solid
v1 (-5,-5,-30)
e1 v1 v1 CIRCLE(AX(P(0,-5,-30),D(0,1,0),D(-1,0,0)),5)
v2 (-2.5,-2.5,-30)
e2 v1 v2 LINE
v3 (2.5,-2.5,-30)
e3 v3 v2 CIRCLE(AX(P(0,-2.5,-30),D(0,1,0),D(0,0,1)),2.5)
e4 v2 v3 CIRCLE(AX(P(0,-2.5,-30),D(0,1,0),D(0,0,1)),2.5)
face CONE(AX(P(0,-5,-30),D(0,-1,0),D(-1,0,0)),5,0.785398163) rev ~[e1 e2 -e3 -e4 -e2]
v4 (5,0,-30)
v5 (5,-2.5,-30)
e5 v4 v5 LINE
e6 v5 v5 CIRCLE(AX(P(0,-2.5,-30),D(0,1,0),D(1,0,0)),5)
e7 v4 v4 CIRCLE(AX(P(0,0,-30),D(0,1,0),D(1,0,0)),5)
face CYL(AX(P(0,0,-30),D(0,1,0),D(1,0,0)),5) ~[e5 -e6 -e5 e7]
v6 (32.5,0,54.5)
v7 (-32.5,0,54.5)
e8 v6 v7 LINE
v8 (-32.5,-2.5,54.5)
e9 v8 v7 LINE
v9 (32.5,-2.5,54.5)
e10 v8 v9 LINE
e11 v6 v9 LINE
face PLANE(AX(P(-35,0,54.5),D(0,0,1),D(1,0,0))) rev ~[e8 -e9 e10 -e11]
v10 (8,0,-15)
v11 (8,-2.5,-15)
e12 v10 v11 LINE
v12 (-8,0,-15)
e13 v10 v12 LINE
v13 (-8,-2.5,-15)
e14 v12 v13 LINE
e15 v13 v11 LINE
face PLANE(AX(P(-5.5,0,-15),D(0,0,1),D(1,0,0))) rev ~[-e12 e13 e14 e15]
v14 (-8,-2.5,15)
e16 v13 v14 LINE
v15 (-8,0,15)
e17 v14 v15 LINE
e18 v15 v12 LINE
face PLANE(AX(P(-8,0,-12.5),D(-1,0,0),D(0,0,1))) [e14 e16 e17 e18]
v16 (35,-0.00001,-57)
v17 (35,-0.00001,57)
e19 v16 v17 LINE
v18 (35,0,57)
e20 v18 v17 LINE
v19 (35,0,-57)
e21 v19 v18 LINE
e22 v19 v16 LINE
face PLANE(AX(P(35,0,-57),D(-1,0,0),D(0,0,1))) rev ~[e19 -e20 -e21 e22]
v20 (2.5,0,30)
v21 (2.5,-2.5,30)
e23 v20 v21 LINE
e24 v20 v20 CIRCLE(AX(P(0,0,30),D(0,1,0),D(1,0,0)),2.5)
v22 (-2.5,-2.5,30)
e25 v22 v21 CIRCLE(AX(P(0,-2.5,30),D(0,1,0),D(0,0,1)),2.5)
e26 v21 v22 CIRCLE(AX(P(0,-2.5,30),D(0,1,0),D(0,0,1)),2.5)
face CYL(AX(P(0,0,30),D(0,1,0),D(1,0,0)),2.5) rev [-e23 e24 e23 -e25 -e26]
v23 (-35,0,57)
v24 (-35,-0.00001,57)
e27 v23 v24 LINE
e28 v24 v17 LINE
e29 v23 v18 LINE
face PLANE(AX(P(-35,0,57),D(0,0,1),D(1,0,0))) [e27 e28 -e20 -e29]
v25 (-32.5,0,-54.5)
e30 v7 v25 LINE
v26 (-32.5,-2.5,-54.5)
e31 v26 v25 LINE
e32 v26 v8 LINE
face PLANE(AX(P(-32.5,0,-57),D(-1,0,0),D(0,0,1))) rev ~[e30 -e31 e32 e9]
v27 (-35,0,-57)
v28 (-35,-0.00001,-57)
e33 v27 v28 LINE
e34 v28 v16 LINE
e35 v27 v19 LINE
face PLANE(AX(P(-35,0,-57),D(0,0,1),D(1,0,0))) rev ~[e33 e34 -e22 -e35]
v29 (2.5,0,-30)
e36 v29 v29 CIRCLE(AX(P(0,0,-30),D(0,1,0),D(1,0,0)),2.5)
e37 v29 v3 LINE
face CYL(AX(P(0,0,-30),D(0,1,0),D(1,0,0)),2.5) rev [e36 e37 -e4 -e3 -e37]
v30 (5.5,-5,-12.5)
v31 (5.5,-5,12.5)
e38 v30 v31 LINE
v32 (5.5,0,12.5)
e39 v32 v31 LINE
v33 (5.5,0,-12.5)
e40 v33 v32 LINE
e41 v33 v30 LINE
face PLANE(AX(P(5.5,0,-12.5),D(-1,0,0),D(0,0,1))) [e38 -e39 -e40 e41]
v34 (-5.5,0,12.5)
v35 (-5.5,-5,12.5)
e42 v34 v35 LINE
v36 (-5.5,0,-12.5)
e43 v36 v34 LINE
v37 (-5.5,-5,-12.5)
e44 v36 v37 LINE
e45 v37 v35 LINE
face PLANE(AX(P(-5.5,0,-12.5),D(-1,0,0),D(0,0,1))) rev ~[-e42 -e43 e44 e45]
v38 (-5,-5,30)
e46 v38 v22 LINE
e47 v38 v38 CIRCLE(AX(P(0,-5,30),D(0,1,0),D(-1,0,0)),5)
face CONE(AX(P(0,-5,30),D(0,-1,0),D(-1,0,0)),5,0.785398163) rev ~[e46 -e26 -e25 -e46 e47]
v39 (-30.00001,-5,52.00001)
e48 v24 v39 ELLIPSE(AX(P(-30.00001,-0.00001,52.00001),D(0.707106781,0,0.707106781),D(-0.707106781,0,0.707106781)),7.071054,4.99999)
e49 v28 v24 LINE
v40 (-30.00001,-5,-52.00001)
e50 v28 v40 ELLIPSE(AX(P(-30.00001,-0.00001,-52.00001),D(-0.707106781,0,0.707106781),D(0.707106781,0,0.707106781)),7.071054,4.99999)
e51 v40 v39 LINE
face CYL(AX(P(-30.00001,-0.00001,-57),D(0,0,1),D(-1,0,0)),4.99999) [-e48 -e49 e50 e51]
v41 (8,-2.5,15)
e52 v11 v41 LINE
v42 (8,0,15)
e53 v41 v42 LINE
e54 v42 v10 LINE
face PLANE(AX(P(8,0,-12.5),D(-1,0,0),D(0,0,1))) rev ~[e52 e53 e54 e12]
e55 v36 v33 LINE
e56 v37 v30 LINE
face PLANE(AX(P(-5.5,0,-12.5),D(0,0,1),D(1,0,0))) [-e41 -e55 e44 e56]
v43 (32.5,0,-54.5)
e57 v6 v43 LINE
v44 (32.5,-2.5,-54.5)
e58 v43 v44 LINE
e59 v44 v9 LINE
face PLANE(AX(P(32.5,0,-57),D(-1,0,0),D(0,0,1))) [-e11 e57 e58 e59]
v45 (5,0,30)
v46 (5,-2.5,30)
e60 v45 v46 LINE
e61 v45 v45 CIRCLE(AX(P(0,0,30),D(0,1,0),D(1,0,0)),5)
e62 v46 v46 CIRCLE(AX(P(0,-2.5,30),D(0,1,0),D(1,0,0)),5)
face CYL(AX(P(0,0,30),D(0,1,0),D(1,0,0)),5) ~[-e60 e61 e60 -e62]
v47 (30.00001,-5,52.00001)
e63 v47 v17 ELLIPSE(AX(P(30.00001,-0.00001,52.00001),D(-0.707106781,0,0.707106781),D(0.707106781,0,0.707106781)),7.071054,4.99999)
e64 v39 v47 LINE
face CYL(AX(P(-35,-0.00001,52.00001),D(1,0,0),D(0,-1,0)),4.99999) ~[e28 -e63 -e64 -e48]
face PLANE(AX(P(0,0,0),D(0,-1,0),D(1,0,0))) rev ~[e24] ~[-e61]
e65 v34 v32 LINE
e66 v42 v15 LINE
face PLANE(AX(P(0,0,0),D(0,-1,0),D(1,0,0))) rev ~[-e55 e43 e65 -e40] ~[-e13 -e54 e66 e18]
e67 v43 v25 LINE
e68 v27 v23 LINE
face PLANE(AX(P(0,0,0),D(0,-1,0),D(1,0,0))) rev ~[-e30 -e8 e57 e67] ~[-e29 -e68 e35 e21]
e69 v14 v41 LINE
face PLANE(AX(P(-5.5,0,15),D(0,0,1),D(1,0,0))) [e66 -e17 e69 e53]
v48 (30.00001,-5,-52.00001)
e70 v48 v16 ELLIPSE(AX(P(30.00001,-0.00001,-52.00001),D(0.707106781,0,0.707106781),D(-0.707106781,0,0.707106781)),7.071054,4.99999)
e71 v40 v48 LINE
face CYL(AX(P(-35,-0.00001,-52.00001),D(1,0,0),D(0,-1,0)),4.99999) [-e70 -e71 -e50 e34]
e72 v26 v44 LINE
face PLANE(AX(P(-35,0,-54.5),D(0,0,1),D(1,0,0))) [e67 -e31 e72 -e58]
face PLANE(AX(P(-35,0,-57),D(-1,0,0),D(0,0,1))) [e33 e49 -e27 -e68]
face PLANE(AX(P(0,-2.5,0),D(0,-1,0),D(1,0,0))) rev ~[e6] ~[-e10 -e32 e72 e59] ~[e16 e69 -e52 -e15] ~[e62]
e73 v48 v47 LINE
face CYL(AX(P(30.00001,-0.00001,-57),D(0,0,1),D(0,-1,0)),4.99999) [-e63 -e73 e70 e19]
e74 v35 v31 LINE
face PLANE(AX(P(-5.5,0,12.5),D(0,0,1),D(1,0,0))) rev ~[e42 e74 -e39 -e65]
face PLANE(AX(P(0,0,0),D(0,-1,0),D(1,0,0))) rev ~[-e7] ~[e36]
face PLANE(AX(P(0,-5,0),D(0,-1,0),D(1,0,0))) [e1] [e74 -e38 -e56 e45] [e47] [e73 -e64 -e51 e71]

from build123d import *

# Parameters (mm, degrees)
F0_W           = 70
F0_H           = 114
F0_R           = 2.5
F0_W_2         = 11
F0_H_2         = 25
F1_DEPTH       = 5
F2_T           = -2.5
F4_D           = 5
F4_CSINK_D     = 10
F4_CSINK_ANGLE = 90
F5_R           = 4.99999


# Not quite as in the source:
# - a fillet or chamfer is up to 0.001 mm smaller than in the source, because OpenCascade refuses the exact size


with BuildPart() as f1:
    # F0 (on Front) → F1 (new body)
    with BuildSketch(Plane.XZ):
        Rectangle(F0_W, F0_H)
        with Locations((0, -30)):
            Circle(F0_R, mode=Mode.SUBTRACT)
        Rectangle(F0_W_2, F0_H_2, mode=Mode.SUBTRACT)
        with Locations((0, 30)):
            Circle(F0_R, mode=Mode.SUBTRACT)
    extrude(amount=F1_DEPTH)

    # F2
    f2_openings = [f1.faces().sort_by_distance(p)[0] for p in [
        (0, 0, -55.662241),
    ]]
    offset(amount=F2_T, openings=f2_openings, kind=Kind.INTERSECTION)

    # F4 (through all)
    with Locations(Plane.XZ.offset(5)):
        with Locations((0, 30), (0, -30)):
            CounterSinkHole(F4_D / 2, F4_CSINK_D / 2, counter_sink_angle=F4_CSINK_ANGLE)

    # F5 (radius 5 in the source; OpenCascade refuses exactly that, so slightly less here)
    f5_edges = [f1.edges().sort_by_distance(p)[0] for p in [
        (-35, -5, 0),
        (0, -5, 57),
        (35, -5, 0),
        (0, -5, -57),
    ]]
    fillet(f5_edges, radius=F5_R)


solid = f1.part
